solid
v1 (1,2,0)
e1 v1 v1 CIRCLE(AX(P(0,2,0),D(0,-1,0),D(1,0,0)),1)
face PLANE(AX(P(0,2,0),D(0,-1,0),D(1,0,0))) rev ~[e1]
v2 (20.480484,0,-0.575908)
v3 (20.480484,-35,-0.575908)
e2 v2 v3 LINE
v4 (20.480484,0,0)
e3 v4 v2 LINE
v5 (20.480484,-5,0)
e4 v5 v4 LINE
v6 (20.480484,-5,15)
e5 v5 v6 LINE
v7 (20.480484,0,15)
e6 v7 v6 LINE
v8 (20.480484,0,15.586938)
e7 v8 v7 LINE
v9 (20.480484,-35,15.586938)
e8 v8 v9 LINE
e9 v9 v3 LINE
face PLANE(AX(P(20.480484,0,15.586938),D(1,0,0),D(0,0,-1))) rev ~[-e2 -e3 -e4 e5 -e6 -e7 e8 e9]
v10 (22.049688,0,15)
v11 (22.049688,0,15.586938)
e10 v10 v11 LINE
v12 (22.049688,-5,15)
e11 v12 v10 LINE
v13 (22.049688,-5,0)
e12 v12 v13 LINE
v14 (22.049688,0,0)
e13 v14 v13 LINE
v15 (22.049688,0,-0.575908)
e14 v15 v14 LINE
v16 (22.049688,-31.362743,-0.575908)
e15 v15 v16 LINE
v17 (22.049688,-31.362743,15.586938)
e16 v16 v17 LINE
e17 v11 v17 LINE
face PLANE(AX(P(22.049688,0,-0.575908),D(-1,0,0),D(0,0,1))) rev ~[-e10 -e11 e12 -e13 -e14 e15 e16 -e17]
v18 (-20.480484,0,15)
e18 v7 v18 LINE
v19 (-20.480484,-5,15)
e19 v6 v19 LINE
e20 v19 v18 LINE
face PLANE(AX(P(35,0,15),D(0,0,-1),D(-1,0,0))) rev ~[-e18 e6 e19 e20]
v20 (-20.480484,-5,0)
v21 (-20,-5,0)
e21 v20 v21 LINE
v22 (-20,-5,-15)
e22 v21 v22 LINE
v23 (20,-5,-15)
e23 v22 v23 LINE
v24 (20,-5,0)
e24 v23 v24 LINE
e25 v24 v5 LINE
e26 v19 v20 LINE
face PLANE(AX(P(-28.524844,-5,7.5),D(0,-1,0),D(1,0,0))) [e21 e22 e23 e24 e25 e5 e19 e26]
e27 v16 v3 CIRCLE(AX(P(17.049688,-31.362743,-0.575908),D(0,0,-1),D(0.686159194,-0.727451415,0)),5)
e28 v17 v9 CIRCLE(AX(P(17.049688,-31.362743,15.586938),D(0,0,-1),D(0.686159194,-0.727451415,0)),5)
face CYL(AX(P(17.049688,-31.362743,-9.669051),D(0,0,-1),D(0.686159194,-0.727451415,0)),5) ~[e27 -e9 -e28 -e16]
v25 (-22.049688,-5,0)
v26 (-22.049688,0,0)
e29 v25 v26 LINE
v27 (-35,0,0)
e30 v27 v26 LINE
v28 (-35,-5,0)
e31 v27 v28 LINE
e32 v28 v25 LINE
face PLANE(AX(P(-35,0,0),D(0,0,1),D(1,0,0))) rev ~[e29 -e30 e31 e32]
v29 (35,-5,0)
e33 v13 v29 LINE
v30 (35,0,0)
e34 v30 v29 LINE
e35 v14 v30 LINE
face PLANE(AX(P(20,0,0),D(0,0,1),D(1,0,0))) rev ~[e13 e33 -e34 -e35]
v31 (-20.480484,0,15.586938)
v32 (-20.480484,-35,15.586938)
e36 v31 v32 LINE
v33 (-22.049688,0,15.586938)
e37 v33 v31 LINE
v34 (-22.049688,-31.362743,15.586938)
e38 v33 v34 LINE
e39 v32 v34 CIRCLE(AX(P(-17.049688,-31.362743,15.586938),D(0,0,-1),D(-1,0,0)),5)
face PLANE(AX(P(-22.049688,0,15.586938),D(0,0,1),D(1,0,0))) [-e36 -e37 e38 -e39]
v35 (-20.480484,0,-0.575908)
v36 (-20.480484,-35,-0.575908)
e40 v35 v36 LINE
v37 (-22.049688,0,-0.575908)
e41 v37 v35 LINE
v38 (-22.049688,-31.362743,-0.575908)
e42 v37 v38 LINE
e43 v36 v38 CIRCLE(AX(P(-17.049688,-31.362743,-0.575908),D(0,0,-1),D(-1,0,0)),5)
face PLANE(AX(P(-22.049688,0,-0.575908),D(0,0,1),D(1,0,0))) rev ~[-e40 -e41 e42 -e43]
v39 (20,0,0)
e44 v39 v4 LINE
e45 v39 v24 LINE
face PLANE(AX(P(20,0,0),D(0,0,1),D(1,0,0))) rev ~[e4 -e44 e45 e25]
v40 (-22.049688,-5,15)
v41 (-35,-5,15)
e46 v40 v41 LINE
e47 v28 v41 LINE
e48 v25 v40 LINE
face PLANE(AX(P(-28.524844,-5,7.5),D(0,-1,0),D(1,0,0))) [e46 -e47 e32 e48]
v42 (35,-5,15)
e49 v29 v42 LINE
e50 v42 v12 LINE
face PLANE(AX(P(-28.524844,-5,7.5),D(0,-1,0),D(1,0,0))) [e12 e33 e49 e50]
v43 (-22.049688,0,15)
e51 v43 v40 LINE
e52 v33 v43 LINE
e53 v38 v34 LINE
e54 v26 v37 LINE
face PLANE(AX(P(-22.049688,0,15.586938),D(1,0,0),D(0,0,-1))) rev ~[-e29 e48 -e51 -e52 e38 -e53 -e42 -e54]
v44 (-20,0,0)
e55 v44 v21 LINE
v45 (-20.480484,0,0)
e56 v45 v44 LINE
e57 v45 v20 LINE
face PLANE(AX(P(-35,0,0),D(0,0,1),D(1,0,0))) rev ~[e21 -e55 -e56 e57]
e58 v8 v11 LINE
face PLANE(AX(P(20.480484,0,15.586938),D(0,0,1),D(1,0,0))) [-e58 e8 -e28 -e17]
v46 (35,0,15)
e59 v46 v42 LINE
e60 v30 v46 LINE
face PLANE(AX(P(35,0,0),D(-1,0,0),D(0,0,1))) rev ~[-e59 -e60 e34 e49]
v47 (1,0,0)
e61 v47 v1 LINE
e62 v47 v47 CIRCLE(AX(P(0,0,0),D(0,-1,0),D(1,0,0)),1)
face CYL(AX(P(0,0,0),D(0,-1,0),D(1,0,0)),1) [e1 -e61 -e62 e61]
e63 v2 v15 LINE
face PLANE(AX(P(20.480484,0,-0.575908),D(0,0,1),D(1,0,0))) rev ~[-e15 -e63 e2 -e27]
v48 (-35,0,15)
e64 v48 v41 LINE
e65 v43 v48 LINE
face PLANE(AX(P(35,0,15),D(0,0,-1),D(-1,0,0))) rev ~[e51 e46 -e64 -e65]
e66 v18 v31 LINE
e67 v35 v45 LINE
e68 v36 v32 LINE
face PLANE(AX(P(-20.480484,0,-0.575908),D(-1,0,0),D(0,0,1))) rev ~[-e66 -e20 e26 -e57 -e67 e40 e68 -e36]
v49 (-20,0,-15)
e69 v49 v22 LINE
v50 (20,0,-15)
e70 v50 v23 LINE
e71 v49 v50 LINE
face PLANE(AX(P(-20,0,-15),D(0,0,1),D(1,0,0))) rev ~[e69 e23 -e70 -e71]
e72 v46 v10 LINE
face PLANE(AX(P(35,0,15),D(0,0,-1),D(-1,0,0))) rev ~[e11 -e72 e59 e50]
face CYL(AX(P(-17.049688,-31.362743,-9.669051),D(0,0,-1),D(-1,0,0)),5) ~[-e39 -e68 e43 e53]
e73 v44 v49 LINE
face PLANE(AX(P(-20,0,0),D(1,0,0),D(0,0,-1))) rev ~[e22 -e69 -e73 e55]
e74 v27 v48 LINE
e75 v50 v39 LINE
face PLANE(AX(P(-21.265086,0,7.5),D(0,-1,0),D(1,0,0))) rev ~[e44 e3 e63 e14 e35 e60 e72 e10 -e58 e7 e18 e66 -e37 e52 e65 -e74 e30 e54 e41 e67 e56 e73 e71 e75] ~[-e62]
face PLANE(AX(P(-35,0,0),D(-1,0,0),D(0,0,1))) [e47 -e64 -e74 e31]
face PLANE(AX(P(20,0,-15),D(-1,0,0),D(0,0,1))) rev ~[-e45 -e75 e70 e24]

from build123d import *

# Parameters (mm, degrees)
F0_W        = 12.9503121972
F0_H        = 15
F0_R        = 1
F0_W_2      = 1.5692040324
F1_DEPTH    = 5
F2_DEPTH    = 2
F0_H_2      = 0.5759084597
F0_H_3      = 0.5869377777
F3_DEPTH    = 35
F4_T1_DEPTH = 34.3491316119


# Not quite as in the source:
# - a fillet or chamfer that OpenCascade refuses, or shapes differently, is made with other operations: its cross-section is extruded or revolved along the edge and cut away or added
# - a feature names something its author has since deleted; it is built from what else it names


with BuildPart() as f1:
    # F0 (on Front) → F1 (new body)
    with BuildSketch(Plane.XZ):
        with Locations((-28.5248439014, 7.5)):
            Rectangle(F0_W, F0_H)
        Polygon((20.4804837704, 0), (20.4804837704, 15), (-20.4804837704, 15), (-20.4804837704, 0), (-20, 0), (-20, -15), (20, -15), (20, 0), align=None)
        Circle(F0_R, mode=Mode.SUBTRACT)
        with Locations((-21.2650857866, 7.5)):
            Rectangle(F0_W_2, F0_H)
        with Locations((21.2650857866, 7.5)):
            Rectangle(F0_W_2, F0_H)
        with Locations((28.5248439014, 7.5)):
            Rectangle(F0_W, F0_H)
        Circle(F0_R)
    extrude(amount=F1_DEPTH)

    # F0 (on Front) → F2 (join)
    with BuildSketch(Plane.XZ):
        Circle(F0_R)
    extrude(amount=-F2_DEPTH)

    # F0 (on Front) → F3 (join)
    with BuildSketch(Plane.XZ):
        with Locations((-21.2650857866, 7.5)):
            Rectangle(F0_W_2, F0_H)
        with Locations((-21.2650857866, -0.2879542299)):
            Rectangle(F0_W_2, F0_H_2)
        with Locations((-21.2650857866, 15.2934688888)):
            Rectangle(F0_W_2, F0_H_3)
        with Locations((21.2650857866, 15.2934688888)):
            Rectangle(F0_W_2, F0_H_3)
        with Locations((21.2650857866, 7.5)):
            Rectangle(F0_W_2, F0_H)
        with Locations((21.2650857866, -0.2879542299)):
            Rectangle(F0_W_2, F0_H_2)
    extrude(amount=F3_DEPTH)

    # F4: fillet of radius 5 on 2 edges, made by hand

    # F4_s2 → F4_t1 (cut)
    with BuildSketch(Plane.XY.offset(-9.669051147)):
        with BuildLine():
            ThreePointArc((-22.0496878028, -31.3627429251), (-21.6406561014, -33.3434019268), (-20.4804837704, -35))
            Line((-20.4804837704, -35), (-22.0496878028, -35))
            Line((-22.0496878028, -35), (-22.0496878028, -31.3627429251))
        make_face()
        with BuildLine():
            ThreePointArc((20.4804837704, -35), (21.6406561014, -33.3434019268), (22.0496878028, -31.3627429251))
            Line((22.0496878028, -31.3627429251), (22.0496878028, -35))
            Line((22.0496878028, -35), (20.4804837704, -35))
        make_face()
    extrude(amount=F4_T1_DEPTH, mode=Mode.SUBTRACT)


solid = f1.part
